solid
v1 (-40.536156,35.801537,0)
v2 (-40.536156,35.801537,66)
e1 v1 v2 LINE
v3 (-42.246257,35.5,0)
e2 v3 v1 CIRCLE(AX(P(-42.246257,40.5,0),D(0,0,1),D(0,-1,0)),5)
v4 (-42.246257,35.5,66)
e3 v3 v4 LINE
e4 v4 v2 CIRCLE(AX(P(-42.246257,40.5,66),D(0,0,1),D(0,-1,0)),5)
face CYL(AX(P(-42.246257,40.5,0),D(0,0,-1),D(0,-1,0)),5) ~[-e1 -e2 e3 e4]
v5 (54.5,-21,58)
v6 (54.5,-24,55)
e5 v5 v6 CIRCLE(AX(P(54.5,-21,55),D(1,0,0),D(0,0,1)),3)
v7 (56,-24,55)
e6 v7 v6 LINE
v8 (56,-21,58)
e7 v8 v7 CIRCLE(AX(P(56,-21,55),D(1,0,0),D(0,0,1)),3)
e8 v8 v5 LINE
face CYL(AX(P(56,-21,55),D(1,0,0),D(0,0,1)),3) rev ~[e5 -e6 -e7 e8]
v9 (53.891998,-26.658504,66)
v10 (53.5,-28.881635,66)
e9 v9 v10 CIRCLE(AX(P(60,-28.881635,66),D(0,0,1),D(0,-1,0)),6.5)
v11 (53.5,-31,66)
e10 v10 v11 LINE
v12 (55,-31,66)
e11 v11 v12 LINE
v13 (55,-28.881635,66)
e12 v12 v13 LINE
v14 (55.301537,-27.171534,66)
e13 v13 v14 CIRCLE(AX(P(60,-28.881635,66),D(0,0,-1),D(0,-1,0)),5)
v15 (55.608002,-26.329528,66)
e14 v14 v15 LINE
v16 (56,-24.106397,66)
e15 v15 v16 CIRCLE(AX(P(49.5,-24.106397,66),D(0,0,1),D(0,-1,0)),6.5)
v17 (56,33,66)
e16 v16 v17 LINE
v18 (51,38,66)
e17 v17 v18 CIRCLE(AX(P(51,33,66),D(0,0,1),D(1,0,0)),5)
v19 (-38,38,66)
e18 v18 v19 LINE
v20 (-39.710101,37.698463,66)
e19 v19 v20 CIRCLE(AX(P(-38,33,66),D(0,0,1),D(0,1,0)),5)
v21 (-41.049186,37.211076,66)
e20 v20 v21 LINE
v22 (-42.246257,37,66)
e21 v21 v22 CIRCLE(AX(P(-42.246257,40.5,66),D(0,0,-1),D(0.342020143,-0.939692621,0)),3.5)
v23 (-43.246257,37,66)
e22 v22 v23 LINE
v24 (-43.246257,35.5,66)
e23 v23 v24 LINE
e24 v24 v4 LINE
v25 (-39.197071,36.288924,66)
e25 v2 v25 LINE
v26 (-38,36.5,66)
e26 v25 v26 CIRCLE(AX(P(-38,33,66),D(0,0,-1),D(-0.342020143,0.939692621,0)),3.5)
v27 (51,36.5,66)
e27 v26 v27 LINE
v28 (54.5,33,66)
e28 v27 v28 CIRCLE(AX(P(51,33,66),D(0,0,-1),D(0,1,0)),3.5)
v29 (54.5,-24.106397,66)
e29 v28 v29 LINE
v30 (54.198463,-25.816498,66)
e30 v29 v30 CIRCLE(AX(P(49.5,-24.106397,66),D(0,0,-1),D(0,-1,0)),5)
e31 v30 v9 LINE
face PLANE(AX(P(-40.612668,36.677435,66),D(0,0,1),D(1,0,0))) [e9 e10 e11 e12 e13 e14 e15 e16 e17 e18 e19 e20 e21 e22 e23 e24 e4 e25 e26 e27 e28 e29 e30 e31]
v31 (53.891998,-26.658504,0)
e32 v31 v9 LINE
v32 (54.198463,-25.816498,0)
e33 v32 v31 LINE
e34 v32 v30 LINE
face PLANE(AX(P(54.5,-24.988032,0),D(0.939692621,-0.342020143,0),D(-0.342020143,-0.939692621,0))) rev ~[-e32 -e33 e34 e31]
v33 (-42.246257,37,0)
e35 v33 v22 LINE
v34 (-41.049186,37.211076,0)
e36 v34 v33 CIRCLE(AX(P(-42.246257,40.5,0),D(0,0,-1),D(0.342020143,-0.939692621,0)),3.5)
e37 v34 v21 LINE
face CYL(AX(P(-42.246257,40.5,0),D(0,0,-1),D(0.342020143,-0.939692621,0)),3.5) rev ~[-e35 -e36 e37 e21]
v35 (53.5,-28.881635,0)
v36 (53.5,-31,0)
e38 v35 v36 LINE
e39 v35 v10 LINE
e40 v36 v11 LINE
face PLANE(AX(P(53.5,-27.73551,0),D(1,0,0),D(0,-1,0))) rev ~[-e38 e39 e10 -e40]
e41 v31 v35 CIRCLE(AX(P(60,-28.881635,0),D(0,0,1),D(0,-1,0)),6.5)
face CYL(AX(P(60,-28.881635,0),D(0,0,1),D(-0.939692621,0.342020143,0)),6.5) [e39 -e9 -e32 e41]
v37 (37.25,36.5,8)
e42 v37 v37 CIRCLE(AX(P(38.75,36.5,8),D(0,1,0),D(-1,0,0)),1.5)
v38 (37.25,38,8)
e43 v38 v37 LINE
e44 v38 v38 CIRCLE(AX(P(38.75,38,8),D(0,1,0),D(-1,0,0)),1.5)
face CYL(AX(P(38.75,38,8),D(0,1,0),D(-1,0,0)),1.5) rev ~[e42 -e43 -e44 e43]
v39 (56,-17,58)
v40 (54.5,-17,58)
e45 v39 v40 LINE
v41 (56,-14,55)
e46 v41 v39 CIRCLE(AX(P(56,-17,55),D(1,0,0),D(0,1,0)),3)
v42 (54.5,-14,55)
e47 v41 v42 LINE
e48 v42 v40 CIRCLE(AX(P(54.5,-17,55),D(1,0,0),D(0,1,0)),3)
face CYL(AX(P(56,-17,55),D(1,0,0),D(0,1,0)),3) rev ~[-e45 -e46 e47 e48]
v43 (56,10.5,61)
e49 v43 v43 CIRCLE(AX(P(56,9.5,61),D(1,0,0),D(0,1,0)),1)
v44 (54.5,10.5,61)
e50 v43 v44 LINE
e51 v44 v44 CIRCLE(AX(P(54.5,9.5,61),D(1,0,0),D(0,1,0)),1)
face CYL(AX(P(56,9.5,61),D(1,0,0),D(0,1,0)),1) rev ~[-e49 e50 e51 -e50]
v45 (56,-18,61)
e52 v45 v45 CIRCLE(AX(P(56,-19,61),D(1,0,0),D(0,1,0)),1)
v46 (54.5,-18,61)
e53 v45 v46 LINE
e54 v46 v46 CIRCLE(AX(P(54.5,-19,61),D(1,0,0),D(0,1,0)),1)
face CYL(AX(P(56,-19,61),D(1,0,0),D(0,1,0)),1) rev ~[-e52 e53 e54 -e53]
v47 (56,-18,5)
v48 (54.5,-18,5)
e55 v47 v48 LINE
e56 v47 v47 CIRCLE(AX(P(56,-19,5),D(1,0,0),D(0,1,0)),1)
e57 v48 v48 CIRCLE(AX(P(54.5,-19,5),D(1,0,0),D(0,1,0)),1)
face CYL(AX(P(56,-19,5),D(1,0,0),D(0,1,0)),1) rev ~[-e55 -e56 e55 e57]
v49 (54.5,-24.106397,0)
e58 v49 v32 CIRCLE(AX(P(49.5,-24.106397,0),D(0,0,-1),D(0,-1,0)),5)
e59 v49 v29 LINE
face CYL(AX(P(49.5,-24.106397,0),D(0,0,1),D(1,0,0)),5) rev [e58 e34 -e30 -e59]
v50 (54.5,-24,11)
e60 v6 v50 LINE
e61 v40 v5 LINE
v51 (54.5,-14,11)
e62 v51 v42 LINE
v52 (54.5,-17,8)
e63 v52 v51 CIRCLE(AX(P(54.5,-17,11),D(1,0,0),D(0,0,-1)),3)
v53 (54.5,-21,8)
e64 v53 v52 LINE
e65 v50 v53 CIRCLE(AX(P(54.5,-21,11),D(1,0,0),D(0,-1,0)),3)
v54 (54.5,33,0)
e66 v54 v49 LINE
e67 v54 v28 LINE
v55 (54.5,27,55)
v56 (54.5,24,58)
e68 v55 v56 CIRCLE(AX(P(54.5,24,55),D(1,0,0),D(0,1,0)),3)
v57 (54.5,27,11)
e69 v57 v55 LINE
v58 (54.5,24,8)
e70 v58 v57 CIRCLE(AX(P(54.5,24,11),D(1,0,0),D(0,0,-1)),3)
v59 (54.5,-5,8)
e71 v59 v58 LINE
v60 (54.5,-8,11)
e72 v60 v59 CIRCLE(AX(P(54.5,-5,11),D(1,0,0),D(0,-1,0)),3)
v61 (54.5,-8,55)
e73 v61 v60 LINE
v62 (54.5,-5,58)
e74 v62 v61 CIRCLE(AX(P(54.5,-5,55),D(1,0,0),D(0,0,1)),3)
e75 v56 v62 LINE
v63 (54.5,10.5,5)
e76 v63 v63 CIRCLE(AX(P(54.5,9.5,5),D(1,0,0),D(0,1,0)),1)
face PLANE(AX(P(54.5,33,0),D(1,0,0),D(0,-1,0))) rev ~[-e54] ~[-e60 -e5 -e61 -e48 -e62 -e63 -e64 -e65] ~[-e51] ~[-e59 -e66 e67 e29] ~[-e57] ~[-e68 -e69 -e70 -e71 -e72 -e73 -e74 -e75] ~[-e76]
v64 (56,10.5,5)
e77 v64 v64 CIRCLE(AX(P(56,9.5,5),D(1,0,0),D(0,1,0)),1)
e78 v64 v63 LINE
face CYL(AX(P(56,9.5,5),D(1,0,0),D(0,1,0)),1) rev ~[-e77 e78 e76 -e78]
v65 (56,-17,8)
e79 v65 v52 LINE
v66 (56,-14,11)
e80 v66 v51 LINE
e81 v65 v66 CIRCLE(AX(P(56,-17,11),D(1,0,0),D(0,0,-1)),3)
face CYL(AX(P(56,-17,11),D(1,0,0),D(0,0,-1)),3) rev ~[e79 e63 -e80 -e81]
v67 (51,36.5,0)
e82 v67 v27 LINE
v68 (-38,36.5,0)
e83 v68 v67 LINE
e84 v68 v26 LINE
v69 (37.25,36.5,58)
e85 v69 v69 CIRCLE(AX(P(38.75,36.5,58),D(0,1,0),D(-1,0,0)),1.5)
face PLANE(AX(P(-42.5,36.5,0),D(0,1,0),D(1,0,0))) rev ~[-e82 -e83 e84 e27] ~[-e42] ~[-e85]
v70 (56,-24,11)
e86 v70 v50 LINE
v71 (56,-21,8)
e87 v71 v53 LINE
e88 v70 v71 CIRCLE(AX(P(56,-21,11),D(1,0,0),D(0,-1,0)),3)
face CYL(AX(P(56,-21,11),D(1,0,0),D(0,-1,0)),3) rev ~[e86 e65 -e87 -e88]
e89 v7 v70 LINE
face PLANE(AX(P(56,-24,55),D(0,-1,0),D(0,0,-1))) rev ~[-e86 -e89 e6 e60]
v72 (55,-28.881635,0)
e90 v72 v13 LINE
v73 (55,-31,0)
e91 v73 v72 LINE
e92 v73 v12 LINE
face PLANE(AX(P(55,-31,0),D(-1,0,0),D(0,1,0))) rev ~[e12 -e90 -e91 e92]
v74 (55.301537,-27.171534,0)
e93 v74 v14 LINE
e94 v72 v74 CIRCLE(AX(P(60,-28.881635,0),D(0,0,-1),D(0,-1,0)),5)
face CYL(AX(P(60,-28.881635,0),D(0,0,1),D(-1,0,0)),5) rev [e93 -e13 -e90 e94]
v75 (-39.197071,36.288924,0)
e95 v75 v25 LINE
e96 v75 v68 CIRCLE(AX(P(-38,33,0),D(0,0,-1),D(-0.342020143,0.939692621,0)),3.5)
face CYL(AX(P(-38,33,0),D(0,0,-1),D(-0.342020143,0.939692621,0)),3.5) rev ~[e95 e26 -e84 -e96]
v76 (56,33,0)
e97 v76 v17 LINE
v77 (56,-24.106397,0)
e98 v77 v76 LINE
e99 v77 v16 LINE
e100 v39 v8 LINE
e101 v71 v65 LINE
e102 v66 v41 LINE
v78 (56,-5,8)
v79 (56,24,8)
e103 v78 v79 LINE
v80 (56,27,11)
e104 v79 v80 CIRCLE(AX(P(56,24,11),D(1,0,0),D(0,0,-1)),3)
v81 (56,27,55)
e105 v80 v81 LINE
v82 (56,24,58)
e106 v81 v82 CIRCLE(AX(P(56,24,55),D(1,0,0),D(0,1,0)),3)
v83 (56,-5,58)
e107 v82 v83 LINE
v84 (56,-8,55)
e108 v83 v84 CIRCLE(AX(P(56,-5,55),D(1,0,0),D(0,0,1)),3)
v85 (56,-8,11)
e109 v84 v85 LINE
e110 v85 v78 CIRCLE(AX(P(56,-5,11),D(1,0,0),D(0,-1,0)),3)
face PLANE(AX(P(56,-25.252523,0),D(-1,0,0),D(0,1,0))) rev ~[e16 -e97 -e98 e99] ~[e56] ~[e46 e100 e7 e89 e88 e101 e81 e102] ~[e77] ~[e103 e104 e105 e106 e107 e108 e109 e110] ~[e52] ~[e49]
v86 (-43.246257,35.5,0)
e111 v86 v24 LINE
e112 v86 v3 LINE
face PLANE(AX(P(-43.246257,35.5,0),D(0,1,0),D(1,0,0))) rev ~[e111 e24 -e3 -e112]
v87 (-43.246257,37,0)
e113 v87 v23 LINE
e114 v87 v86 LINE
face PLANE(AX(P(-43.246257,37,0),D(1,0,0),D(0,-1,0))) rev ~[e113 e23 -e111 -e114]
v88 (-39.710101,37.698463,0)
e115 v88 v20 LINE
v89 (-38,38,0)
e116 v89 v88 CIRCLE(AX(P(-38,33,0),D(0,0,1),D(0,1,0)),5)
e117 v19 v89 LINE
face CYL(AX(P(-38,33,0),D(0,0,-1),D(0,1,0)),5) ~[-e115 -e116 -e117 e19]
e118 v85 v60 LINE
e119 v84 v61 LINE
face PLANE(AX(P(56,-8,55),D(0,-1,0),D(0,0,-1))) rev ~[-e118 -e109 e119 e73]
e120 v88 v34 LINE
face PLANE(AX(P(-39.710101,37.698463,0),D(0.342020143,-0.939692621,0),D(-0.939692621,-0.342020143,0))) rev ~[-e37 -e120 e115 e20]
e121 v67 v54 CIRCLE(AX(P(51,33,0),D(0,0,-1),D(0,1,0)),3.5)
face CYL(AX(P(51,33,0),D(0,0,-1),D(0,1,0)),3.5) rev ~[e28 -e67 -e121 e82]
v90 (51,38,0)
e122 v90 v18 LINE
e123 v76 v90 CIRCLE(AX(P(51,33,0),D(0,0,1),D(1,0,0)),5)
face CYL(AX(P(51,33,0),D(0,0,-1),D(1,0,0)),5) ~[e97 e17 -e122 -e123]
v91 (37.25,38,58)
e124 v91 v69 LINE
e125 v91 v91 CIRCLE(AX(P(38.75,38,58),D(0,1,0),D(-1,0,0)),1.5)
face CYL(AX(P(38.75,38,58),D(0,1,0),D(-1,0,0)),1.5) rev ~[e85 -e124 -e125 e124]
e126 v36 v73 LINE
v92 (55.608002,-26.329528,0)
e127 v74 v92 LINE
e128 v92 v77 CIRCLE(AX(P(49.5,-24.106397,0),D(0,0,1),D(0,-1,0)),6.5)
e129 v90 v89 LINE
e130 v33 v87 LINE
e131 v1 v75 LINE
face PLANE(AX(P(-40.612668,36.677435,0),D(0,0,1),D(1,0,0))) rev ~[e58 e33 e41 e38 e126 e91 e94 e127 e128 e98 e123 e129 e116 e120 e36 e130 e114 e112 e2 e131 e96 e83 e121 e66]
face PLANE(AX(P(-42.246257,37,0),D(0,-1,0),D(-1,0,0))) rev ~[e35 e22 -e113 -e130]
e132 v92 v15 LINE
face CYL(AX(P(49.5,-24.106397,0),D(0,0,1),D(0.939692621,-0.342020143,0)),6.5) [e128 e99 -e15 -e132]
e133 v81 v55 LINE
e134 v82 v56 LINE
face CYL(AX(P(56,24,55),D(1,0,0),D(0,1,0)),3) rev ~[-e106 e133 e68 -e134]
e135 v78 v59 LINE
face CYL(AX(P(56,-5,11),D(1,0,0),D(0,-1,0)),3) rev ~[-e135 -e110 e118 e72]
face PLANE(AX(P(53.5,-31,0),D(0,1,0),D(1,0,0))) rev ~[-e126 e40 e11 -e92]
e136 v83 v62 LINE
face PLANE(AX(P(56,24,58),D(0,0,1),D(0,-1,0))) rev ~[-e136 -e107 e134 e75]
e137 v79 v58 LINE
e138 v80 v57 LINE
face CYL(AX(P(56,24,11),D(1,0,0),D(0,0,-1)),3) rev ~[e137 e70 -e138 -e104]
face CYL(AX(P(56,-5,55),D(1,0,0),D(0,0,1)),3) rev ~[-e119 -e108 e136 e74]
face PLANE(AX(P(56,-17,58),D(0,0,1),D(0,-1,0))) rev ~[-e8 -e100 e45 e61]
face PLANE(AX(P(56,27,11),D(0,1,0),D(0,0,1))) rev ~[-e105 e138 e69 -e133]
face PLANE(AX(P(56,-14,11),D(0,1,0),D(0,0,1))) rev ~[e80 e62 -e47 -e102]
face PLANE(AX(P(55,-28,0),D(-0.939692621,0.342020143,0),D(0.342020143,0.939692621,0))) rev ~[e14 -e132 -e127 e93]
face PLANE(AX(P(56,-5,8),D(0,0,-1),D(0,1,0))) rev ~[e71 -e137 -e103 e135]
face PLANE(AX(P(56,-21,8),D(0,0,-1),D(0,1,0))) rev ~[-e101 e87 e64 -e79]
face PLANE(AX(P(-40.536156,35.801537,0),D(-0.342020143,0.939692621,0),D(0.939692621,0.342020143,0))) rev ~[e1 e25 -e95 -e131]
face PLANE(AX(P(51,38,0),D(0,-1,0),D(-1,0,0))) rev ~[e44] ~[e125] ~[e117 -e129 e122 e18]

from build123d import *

# Parameters (mm, degrees)
F1_DEPTH  = 66
F2_R      = 1.5
F3_DEPTH  = 25
F4_R      = 1
F5_DEPTH  = 25
F6_R      = 5
F7_R      = 6.5
F8_W      = 11.5
F8_H      = 48
F9_DEPTH  = 100
F11_DEPTH = 66


# Not quite as in the source:
# - a feature names something its author has since deleted; it is built from what else it names


with BuildPart() as f1:
    # F0 (on Top) → F1 (new body)
    with BuildSketch(Plane.XY):
        with BuildLine():
            Line((54.5, 33), (54.5, -24.9880321095))
            Line((54.5, -24.9880321095), (53.5, -27.7355095289))
            Line((53.5, -27.7355095289), (53.5, -31))
            Line((53.5, -31), (55, -31))
            Line((55, -31), (55, -28))
            Line((55, -28), (56, -25.2525225805))
            Line((56, -25.2525225805), (56, 33))
            ThreePointArc((56, 33), (54.5355339059, 36.5355339059), (51, 38))
            Line((51, 38), (-42.5, 38))
            ThreePointArc((-42.5, 38), (-46.0355339059, 36.5355339059), (-47.5, 33))
            Line((-47.5, 33), (-47.5, 0))
            Line((-47.5, 0), (-46.000000001, 0))
            Line((-46.000000001, 0), (-46.000000001, 33))
            ThreePointArc((-46.000000001, 33), (-44.9748737349, 35.4748737349), (-42.5, 36.500000001))
            Line((-42.5, 36.5), (51, 36.5))
            ThreePointArc((51, 36.5), (53.4748737342, 35.4748737342), (54.5, 33))
        make_face()
    extrude(amount=F1_DEPTH)

    # F2 (on face) → F3 (cut)
    with BuildSketch(Plane(origin=(0, 38, 0), x_dir=(-1, 0, 0), z_dir=(0, 1, 0))):
        with Locations((-38.75, 58)):
            Circle(F2_R)
        with Locations((-38.75, 8)):
            Circle(F2_R)
    extrude(amount=-F3_DEPTH, mode=Mode.SUBTRACT)

    # F4 (on face) → F5 (cut)
    with BuildSketch(Plane.YZ.offset(56)):
        with BuildLine():
            Line((-17, 58), (-21, 58))
            ThreePointArc((-21, 58), (-23.1213203436, 57.1213203436), (-24, 55))
            Line((-24, 55), (-24, 11))
            ThreePointArc((-24, 11), (-23.1213203436, 8.8786796564), (-21, 8))
            Line((-21, 8), (-17, 8))
            ThreePointArc((-17, 8), (-14.8786796564, 8.8786796564), (-14, 11))
            Line((-14, 11), (-14, 55))
            ThreePointArc((-14, 55), (-14.8786796564, 57.1213203436), (-17, 58))
        make_face()
        with BuildLine():
            Line((24, 58), (-5, 58))
            ThreePointArc((-5, 58), (-7.1213203436, 57.1213203436), (-8, 55))
            Line((-8, 55), (-8, 11))
            ThreePointArc((-8, 11), (-7.1213203436, 8.8786796564), (-5, 8))
            Line((-5, 8), (24, 8))
            ThreePointArc((24, 8), (26.1213203436, 8.8786796564), (27, 11))
            Line((27, 11), (27, 55))
            ThreePointArc((27, 55), (26.1213203436, 57.1213203436), (24, 58))
        make_face()
        with Locations((-19, 61)):
            Circle(F4_R)
        with Locations((9.5, 61)):
            Circle(F4_R)
        with Locations((9.5, 5)):
            Circle(F4_R)
        with Locations((-19, 5)):
            Circle(F4_R)
    extrude(amount=-F5_DEPTH, mode=Mode.SUBTRACT)

    # F6
    f6_edges = [f1.edges().sort_by_distance(p)[0] for p in [
        (55, -28, 33),
        (54.5, -24.988032, 33),
    ]]
    fillet(f6_edges, radius=F6_R)

    # F7
    f7_edges = [f1.edges().sort_by_distance(p)[0] for p in [
        (56, -25.252523, 33),
        (53.5, -27.73551, 33),
    ]]
    fillet(f7_edges, radius=F7_R)

    # F8 (on Top) → F9 (cut)
    with BuildSketch(Plane.XY):
        with Locations((-43.75, 19)):
            Rectangle(F8_W, F8_H)
    extrude(amount=F9_DEPTH, mode=Mode.SUBTRACT)

    # F10 (on Top) → F11 (join)
    with BuildSketch(Plane.XY):
        with BuildLine():
            Line((-43.2462567555, 37), (-43.2462567555, 35.5))
            Line((-43.2462567555, 35.5), (-42.2462567555, 35.5))
            ThreePointArc((-42.2462567555, 35.5), (-41.3780158671, 35.5759612349), (-40.5361560388, 35.8015368961))
            Line((-40.5361560388, 35.8015368961), (-39.1970705016, 36.2889241728))
            ThreePointArc((-39.1970705016, 36.2889241728), (-38.6077686218, 36.4468271355), (-38, 36.5))
            Line((-38, 36.5), (-38, 38))
            ThreePointArc((-38, 38), (-38.8682408883, 37.9240387651), (-39.7101007166, 37.6984631039))
            Line((-39.7101007166, 37.6984631039), (-41.0491862538, 37.2110758272))
            ThreePointArc((-41.0491862538, 37.2110758272), (-41.6384881336, 37.0531728645), (-42.2462567555, 37))
            Line((-42.2462567555, 37), (-43.2462567555, 37))
        make_face()
    extrude(amount=F11_DEPTH)


solid = f1.part
